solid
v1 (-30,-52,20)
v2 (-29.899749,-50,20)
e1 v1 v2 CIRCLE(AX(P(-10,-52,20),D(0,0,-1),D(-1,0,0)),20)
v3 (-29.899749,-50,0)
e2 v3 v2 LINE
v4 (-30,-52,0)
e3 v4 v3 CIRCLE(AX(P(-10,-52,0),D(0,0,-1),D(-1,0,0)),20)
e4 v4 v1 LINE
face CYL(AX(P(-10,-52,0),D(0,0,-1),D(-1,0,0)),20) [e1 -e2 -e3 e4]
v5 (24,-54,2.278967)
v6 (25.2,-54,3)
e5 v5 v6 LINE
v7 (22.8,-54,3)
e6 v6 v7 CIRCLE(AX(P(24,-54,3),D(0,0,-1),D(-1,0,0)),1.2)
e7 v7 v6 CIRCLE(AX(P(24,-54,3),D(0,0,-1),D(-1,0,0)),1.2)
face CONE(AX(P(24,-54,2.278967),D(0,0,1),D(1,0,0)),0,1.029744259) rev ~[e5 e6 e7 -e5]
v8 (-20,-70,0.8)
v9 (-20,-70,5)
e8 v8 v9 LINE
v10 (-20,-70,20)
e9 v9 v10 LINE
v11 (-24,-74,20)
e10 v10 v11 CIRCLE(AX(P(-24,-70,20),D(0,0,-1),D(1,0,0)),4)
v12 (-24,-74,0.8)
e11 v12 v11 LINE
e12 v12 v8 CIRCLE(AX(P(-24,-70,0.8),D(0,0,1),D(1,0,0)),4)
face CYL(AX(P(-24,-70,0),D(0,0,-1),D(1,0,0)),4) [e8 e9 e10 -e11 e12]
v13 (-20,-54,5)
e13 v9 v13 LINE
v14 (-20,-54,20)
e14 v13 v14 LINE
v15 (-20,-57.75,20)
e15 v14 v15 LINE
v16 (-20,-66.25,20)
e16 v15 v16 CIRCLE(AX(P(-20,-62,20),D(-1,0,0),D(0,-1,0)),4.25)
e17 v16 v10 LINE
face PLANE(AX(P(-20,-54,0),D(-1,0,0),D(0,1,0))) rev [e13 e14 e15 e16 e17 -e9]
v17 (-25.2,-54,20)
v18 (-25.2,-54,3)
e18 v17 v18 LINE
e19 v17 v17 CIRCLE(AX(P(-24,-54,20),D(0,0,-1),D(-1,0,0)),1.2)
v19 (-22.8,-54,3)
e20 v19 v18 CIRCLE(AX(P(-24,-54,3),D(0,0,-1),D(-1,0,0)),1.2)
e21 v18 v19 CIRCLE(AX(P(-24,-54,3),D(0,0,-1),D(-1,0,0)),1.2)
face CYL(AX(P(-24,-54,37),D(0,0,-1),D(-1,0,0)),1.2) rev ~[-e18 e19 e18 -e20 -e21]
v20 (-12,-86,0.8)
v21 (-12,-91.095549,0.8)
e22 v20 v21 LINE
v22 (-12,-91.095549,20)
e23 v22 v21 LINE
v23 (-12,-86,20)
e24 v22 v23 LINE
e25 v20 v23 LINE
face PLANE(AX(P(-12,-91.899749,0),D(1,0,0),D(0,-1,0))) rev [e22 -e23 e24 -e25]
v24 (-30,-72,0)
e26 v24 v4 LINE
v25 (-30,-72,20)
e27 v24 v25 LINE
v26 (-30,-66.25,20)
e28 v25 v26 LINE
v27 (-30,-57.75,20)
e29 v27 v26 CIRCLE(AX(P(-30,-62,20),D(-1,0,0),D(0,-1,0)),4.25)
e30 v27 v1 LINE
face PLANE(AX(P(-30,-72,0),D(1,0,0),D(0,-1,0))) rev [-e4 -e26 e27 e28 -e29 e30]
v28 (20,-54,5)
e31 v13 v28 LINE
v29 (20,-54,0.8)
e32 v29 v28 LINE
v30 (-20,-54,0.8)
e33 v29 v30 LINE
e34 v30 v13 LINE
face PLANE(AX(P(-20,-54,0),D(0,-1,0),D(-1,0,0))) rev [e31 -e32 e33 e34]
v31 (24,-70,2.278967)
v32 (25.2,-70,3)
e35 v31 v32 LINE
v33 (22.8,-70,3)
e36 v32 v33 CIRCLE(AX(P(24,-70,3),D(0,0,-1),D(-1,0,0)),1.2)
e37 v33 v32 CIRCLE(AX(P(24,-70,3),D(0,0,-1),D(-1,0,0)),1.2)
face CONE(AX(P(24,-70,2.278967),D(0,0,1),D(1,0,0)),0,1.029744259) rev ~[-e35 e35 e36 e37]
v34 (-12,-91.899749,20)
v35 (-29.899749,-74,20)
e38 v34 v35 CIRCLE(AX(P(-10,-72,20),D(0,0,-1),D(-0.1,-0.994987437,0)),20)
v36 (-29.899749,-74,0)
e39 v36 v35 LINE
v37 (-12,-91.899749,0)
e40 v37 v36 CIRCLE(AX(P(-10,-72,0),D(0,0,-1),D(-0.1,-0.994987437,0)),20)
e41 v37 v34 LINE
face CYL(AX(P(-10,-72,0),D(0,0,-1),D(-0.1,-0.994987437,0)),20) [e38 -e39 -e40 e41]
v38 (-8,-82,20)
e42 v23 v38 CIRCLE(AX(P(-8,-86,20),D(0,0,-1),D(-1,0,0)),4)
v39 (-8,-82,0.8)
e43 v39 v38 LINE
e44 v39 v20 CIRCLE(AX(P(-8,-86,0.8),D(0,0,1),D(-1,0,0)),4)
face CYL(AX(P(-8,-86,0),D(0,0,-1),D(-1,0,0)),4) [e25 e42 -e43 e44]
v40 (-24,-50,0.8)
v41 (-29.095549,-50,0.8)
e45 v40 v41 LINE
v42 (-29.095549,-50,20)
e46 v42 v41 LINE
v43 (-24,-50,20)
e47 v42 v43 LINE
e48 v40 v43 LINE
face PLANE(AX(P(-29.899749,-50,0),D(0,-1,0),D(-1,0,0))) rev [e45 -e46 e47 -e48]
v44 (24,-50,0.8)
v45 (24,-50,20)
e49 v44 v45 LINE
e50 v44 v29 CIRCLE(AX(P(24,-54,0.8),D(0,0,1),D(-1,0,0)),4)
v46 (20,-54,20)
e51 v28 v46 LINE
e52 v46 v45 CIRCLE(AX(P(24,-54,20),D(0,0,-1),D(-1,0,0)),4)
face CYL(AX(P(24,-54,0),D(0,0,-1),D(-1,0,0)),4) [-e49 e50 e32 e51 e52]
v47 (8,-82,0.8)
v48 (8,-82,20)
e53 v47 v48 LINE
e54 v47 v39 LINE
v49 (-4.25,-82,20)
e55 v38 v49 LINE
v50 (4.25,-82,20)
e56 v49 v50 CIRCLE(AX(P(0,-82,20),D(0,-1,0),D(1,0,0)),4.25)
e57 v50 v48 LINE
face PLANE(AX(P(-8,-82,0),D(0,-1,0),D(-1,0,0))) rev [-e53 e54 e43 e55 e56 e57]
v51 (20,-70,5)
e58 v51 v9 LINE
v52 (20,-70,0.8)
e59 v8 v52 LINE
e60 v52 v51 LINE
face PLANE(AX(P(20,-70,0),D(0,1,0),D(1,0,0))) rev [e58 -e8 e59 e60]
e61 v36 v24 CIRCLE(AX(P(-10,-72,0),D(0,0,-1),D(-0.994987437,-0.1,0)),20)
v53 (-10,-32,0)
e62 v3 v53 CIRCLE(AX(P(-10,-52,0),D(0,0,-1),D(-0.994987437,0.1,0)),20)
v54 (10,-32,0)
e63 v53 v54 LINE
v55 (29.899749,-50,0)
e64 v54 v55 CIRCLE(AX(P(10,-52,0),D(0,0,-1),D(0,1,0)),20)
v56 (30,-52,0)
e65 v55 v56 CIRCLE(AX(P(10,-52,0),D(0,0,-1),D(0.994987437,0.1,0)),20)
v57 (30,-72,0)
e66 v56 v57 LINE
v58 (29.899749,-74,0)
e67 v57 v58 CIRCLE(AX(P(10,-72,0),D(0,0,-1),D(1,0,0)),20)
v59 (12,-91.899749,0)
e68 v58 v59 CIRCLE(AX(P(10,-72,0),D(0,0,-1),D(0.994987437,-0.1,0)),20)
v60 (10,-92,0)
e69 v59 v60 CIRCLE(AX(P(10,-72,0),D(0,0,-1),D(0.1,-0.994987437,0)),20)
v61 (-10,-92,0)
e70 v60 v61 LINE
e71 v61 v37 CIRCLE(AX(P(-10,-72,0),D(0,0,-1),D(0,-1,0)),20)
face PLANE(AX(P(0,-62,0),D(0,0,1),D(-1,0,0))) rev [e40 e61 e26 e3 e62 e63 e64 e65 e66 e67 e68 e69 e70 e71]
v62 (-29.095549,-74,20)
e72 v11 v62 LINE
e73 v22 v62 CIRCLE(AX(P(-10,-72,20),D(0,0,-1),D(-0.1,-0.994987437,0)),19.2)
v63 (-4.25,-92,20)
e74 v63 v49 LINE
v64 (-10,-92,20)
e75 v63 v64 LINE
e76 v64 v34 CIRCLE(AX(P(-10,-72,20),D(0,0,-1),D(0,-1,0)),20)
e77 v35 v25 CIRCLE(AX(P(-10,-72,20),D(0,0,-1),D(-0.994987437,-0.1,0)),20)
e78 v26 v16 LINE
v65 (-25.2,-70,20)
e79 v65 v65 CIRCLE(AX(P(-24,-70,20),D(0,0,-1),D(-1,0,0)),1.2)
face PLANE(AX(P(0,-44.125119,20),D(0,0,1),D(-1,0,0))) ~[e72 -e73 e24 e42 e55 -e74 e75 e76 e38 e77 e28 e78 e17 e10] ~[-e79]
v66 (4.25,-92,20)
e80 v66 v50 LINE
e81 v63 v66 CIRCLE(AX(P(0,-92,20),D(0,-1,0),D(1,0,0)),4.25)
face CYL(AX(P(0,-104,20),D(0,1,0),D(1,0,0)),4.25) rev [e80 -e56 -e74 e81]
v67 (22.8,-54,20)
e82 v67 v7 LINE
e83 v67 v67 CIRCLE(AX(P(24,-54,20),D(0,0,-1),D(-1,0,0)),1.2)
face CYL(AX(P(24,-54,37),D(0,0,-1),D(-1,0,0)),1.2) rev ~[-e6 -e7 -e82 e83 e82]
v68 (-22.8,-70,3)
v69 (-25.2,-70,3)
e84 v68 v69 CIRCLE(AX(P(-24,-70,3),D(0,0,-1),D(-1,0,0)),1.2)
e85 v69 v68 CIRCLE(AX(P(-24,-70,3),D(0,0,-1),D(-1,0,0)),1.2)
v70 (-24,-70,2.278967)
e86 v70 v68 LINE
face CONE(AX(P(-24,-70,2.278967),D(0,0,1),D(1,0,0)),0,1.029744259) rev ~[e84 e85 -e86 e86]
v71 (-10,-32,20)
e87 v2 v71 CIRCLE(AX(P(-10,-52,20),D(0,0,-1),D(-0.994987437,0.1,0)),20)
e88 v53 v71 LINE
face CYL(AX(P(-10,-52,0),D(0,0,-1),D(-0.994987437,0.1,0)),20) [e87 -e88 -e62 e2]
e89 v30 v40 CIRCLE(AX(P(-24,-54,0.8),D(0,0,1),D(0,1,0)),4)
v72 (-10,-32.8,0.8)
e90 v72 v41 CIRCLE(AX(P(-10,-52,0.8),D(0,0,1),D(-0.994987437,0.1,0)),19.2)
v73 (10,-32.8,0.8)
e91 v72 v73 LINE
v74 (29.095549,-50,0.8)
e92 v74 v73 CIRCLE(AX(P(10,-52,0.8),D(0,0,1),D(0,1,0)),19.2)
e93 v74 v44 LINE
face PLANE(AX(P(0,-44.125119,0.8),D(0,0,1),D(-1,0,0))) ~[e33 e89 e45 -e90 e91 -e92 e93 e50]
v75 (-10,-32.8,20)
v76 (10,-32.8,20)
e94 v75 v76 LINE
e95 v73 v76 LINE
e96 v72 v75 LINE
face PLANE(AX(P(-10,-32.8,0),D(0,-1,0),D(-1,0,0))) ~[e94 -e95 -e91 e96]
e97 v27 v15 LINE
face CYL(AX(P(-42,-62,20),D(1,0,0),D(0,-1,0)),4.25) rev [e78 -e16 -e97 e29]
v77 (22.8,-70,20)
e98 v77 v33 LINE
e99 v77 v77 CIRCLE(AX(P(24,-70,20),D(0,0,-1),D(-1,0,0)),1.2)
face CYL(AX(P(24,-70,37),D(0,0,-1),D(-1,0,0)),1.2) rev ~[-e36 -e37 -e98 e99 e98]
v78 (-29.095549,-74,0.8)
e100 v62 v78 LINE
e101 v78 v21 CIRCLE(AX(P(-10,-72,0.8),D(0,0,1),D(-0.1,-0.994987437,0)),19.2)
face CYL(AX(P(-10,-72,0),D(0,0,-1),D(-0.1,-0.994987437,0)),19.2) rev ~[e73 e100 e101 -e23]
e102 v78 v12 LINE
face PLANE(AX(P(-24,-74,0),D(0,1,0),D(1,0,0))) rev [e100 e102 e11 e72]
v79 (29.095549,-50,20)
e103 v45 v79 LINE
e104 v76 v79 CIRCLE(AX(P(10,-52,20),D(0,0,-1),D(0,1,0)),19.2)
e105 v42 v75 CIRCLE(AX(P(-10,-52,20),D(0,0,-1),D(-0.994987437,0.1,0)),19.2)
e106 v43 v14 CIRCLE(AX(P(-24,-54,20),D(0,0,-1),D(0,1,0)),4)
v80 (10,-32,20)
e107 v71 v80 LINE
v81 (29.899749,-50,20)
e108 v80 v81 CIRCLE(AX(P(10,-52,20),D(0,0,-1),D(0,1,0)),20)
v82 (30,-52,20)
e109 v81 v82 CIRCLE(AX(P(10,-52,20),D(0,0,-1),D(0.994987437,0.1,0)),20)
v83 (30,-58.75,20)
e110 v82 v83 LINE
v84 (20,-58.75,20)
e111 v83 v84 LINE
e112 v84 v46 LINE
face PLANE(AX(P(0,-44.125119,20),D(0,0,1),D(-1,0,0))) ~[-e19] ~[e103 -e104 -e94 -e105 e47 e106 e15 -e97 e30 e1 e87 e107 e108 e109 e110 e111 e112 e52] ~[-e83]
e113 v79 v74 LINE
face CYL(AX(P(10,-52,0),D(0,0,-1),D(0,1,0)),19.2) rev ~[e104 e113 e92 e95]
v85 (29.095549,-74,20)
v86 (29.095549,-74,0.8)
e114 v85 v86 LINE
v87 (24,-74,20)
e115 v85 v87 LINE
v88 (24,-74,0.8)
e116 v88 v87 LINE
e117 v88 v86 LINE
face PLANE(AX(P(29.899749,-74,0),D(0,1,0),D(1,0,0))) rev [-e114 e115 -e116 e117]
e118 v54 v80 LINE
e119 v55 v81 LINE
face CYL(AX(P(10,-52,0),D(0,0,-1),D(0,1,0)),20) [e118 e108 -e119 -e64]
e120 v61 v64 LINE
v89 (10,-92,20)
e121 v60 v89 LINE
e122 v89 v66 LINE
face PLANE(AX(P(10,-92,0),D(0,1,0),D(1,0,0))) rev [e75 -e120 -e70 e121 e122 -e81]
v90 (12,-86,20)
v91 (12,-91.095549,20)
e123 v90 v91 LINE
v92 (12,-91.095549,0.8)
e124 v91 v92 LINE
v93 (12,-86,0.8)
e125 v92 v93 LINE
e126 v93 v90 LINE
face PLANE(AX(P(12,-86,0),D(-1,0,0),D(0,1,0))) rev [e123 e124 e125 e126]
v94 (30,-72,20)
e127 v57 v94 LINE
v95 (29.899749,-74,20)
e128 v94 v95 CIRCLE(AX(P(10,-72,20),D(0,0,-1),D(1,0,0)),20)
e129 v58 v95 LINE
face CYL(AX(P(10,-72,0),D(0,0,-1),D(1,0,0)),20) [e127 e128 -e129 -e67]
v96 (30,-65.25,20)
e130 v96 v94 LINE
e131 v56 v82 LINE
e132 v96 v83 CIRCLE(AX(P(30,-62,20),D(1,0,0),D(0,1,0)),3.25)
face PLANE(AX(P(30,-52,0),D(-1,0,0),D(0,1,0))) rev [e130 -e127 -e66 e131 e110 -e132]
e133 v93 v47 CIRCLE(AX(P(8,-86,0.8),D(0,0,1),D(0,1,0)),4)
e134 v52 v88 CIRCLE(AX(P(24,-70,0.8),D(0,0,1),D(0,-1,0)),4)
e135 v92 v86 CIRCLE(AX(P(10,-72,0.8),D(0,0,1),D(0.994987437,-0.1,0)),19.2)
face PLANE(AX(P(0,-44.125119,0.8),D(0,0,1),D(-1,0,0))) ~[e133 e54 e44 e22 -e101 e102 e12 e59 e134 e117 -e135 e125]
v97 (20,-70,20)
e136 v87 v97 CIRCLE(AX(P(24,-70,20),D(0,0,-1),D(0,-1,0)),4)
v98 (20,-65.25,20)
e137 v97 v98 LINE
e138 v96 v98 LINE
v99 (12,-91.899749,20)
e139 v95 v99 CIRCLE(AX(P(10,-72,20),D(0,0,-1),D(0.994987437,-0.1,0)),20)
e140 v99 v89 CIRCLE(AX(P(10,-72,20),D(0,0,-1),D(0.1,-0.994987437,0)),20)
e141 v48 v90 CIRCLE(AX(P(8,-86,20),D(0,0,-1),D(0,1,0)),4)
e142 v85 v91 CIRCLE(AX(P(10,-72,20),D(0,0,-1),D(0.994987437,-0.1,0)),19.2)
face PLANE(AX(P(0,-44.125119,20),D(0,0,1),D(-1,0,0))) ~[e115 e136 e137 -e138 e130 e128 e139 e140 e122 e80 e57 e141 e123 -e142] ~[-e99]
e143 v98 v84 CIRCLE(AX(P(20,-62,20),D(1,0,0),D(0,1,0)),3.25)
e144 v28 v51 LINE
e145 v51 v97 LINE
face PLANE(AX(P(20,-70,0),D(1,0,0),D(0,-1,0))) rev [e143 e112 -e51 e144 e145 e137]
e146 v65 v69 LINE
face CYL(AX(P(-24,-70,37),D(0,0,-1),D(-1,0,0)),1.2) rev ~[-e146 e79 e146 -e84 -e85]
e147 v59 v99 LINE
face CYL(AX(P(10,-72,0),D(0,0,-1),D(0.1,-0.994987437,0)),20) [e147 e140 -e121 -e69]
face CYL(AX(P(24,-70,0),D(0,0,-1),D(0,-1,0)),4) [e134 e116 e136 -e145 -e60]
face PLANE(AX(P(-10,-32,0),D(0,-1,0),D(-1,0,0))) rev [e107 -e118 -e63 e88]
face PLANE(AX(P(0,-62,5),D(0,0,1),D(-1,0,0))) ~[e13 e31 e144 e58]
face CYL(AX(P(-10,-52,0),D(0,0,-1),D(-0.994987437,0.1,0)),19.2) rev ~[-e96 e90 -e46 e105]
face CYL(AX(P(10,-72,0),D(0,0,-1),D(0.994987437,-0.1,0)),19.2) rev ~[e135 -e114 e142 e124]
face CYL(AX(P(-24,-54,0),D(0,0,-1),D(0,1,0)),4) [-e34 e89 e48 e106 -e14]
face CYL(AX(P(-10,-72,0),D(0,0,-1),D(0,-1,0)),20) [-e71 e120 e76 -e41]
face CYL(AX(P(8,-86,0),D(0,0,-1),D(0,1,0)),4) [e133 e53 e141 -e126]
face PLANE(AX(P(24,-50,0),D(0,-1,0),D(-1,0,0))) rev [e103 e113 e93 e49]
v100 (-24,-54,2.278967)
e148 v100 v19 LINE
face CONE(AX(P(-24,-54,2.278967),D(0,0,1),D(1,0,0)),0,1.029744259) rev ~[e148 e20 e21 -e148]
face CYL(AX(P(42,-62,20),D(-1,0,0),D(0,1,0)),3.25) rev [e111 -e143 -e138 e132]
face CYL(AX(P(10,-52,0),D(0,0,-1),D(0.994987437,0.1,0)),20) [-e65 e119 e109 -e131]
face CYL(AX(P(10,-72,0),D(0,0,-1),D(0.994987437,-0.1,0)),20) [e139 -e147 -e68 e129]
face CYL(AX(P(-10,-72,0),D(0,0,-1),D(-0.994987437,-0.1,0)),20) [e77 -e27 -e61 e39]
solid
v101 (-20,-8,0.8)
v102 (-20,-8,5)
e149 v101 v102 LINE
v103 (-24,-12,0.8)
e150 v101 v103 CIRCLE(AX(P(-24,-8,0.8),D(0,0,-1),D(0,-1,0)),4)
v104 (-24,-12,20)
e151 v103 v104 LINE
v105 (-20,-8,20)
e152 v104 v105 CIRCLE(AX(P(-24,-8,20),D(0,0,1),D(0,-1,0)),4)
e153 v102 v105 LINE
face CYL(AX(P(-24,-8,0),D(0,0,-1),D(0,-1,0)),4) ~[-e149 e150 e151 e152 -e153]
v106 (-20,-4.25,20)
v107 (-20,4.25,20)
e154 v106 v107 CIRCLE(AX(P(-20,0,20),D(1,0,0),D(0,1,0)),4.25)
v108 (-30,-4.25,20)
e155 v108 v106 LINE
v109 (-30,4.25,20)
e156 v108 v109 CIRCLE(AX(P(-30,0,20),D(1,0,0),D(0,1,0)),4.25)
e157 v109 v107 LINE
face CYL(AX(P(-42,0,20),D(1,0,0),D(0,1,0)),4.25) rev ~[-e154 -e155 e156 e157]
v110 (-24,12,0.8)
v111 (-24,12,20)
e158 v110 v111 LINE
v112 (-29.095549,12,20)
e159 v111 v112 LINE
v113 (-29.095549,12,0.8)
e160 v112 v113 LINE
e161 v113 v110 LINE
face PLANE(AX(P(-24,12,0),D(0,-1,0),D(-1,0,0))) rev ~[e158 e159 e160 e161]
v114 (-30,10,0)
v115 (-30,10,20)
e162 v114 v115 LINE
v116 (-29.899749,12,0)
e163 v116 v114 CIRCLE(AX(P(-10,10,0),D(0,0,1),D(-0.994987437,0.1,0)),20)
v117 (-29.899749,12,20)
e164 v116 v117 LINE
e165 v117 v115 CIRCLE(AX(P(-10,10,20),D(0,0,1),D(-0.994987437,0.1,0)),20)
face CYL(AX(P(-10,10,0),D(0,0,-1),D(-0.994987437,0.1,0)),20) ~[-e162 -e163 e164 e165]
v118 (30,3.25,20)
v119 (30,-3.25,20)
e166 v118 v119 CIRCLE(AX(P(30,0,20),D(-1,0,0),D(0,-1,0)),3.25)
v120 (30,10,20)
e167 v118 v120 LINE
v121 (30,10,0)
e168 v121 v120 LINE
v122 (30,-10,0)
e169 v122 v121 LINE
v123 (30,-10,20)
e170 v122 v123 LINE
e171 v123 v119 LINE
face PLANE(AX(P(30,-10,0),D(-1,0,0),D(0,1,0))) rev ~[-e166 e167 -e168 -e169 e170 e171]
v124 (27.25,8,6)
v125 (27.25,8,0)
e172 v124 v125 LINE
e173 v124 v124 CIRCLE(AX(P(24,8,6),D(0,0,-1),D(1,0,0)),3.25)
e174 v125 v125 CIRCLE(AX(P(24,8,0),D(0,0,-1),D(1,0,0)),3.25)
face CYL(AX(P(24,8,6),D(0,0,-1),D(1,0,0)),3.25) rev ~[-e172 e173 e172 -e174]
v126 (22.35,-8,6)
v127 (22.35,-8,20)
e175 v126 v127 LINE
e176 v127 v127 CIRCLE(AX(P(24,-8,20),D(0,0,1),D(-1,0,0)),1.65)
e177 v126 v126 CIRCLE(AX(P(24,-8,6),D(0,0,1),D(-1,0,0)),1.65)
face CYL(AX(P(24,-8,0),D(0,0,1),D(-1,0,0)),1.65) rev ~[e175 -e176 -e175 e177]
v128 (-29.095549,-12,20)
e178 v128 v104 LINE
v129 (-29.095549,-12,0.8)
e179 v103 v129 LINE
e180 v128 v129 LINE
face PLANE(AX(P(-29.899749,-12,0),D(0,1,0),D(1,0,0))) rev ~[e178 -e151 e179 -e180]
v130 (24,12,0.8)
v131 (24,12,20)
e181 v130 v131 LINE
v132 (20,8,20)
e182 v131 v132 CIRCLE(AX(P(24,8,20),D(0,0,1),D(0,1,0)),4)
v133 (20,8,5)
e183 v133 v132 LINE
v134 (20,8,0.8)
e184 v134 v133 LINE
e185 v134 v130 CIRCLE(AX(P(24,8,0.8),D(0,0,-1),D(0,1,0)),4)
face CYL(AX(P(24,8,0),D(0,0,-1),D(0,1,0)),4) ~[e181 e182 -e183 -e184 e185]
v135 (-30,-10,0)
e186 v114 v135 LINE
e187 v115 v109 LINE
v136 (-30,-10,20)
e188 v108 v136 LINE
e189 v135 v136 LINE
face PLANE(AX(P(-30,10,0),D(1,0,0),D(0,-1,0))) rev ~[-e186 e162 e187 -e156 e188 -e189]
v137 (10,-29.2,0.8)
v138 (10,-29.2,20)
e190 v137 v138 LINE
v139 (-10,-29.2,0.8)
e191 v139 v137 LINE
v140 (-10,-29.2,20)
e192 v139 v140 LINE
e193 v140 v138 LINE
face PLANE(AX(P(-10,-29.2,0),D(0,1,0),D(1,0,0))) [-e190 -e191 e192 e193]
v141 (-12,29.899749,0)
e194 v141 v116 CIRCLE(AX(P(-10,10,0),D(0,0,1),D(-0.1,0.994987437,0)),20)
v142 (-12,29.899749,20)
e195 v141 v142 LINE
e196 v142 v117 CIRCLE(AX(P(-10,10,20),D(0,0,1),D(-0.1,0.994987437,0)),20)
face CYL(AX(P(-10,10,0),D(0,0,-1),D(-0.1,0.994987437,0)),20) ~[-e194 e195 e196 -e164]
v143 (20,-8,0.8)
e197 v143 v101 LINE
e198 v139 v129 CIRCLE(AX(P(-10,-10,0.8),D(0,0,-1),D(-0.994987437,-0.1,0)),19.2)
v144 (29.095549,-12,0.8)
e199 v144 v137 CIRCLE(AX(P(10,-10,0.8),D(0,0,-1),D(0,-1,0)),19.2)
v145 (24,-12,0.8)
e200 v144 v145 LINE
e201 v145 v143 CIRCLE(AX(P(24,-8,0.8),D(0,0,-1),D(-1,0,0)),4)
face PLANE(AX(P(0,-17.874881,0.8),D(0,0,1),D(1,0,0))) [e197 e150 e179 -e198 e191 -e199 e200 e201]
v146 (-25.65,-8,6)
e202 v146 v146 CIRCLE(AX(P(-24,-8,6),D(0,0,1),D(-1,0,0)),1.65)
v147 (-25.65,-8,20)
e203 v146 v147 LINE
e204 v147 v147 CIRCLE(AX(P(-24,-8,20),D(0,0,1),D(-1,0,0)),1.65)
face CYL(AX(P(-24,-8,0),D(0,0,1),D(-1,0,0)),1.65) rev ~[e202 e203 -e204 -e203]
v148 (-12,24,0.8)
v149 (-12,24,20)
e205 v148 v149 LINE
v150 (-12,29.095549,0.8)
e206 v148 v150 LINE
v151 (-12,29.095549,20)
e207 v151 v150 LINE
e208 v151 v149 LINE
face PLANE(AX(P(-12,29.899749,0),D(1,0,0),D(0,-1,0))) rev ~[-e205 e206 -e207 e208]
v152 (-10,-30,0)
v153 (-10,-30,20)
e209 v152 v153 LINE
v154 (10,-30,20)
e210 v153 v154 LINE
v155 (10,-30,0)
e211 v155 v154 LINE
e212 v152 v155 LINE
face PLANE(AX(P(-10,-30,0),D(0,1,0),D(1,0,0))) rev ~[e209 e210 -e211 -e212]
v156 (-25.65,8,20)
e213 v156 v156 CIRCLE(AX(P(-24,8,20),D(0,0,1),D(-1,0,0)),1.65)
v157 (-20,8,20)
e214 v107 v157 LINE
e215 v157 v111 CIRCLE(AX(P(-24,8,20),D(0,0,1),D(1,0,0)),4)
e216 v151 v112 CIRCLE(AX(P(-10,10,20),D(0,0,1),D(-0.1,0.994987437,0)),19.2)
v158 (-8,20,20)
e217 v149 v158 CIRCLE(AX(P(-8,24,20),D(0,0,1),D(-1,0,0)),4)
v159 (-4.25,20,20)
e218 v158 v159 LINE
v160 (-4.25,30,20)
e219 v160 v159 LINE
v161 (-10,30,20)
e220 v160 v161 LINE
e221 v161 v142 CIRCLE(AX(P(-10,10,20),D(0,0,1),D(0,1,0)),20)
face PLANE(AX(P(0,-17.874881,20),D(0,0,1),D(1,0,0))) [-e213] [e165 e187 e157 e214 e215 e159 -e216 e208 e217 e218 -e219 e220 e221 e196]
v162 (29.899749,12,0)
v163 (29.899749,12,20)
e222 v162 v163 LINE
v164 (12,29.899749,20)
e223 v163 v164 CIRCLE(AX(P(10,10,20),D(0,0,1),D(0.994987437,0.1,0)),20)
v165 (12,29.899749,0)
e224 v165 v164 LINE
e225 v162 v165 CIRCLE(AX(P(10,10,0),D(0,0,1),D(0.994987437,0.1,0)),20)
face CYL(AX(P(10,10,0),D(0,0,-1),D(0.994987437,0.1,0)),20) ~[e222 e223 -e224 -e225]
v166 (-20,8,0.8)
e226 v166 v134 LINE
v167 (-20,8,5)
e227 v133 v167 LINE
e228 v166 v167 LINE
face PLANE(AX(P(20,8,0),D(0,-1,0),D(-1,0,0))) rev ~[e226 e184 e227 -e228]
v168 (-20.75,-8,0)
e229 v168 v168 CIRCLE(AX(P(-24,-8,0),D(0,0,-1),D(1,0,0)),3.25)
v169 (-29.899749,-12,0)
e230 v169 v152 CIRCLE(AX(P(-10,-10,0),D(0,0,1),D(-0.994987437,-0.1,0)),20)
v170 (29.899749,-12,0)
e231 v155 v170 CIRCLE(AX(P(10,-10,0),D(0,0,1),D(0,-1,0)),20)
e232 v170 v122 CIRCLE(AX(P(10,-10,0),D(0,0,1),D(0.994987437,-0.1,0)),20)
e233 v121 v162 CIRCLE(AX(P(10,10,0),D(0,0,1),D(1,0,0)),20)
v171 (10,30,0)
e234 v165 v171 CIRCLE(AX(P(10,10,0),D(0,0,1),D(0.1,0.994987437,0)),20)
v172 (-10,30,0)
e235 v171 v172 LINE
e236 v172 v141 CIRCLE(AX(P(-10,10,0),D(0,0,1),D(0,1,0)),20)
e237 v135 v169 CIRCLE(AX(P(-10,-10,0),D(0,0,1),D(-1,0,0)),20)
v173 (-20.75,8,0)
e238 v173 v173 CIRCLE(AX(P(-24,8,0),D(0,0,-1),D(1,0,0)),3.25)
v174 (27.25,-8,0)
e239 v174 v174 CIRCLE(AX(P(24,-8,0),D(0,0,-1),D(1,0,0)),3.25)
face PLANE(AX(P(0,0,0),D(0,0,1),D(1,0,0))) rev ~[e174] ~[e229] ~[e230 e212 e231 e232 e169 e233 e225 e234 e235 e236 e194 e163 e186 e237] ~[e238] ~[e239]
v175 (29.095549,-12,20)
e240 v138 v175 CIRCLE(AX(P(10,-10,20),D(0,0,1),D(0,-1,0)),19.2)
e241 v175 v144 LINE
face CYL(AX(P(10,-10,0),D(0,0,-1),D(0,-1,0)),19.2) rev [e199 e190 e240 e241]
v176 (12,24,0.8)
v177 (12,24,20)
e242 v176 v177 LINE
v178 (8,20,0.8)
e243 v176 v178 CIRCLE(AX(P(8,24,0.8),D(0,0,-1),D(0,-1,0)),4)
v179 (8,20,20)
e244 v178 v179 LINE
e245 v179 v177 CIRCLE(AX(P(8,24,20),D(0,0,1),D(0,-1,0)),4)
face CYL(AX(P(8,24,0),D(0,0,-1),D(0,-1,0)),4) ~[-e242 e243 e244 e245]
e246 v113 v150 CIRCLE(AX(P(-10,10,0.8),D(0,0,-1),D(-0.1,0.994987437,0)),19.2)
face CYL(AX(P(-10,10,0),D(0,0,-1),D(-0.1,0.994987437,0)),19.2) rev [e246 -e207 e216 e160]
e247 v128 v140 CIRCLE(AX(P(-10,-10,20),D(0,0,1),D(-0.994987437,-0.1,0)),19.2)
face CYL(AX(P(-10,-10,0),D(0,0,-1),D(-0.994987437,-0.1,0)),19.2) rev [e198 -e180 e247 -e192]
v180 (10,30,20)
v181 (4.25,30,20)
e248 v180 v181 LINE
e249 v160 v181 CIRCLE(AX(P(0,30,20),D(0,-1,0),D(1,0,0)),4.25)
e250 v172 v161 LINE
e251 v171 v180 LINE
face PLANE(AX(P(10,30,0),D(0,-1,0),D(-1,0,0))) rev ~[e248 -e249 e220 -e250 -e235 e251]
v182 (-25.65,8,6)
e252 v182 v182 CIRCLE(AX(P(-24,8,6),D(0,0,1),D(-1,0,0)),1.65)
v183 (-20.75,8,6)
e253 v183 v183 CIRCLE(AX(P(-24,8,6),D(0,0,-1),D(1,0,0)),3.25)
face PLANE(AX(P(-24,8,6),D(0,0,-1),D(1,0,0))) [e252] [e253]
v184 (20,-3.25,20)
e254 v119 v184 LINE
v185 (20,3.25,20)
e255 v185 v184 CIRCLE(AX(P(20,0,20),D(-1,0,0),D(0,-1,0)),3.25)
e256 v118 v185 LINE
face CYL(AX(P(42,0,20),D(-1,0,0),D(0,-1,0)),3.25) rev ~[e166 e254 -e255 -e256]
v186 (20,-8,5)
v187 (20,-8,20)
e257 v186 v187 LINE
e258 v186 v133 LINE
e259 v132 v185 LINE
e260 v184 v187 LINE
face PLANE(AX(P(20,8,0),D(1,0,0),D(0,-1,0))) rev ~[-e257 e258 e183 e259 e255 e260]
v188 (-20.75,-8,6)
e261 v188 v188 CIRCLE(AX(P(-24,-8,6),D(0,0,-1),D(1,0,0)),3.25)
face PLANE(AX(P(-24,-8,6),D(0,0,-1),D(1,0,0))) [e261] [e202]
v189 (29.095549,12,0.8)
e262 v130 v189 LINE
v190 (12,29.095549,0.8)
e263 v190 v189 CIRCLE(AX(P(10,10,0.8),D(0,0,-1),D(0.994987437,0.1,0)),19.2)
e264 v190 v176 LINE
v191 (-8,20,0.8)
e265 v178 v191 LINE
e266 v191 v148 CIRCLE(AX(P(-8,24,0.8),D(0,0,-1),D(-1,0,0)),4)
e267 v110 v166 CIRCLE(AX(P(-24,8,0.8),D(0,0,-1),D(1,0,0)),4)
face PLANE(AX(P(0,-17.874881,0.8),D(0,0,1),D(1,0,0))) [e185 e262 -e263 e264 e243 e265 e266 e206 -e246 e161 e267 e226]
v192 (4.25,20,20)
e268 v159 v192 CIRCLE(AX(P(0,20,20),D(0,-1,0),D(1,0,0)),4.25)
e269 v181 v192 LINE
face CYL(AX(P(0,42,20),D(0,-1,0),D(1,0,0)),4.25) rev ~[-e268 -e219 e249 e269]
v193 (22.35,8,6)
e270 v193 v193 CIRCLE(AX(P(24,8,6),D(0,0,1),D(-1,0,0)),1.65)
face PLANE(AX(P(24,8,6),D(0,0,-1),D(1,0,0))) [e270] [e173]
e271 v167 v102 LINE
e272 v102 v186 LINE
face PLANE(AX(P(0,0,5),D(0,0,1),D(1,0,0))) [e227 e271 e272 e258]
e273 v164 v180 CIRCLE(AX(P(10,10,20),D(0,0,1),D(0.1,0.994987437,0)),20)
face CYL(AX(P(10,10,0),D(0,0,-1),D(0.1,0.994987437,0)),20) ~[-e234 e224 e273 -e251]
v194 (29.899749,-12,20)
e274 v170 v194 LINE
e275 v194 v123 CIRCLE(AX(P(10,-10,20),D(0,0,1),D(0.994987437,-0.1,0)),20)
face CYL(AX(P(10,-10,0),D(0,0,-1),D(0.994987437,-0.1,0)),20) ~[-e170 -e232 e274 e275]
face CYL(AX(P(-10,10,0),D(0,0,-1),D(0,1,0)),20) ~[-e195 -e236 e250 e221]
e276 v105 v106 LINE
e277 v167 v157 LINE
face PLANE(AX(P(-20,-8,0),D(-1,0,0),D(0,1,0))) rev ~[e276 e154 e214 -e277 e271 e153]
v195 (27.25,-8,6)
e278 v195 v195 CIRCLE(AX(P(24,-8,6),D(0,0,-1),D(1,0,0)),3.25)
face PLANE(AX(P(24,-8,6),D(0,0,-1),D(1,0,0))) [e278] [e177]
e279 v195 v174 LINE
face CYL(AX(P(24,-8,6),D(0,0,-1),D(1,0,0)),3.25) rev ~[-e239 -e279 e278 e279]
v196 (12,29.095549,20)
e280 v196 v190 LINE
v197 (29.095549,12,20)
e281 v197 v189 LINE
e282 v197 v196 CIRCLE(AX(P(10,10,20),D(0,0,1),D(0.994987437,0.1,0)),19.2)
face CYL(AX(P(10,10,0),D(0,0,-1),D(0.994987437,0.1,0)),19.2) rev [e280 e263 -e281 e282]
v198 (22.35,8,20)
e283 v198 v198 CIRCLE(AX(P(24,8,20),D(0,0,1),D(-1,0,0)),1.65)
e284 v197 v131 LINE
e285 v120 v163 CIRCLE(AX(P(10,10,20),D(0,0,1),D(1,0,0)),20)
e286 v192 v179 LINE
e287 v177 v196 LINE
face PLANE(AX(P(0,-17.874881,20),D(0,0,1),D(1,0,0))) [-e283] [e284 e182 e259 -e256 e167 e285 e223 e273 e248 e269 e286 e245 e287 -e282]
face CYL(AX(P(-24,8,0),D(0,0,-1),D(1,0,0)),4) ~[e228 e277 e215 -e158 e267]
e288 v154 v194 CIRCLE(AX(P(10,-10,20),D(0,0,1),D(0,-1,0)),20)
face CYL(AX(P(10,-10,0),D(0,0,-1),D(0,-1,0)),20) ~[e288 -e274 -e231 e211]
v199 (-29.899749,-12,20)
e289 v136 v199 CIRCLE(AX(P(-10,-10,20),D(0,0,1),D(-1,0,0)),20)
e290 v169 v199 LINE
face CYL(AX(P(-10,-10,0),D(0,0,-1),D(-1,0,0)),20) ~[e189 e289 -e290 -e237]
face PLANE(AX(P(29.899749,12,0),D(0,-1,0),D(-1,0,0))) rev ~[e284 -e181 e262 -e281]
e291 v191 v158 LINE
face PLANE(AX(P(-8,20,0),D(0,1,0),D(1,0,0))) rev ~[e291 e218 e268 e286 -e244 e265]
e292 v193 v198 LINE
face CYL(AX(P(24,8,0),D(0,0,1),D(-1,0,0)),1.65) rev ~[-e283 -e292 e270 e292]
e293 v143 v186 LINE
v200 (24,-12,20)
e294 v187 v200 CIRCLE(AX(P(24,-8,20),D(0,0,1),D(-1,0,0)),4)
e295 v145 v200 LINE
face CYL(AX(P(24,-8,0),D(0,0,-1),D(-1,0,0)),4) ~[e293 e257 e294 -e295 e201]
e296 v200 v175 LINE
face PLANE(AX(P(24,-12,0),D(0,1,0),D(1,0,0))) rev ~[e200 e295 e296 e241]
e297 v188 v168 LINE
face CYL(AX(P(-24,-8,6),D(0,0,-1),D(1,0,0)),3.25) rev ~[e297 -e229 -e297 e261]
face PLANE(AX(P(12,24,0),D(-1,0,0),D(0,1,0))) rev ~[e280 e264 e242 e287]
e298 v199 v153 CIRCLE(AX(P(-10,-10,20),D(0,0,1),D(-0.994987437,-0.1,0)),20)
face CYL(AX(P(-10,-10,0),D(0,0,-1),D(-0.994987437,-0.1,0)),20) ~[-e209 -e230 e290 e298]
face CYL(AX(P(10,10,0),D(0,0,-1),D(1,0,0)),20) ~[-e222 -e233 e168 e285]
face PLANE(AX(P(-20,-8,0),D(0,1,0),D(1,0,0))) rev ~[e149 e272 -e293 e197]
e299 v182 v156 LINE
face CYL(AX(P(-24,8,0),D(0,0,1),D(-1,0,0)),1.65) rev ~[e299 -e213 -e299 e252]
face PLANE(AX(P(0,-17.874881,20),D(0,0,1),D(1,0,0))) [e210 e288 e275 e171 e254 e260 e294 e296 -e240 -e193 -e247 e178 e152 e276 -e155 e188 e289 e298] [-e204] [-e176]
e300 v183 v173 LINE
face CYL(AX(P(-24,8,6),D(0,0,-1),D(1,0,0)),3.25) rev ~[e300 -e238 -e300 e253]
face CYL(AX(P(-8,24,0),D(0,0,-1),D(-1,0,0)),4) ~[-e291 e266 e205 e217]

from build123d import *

# Parameters (mm, degrees)
F1_DEPTH        = 20
F2_T            = -0.8
F3_DEPTH        = 5
F4_DEPTH        = 20
F6_D            = 8.5
F6_DEPTH        = 12
F6_TIP          = 2.5536576309
F8_D            = 8.5
F8_DEPTH        = 12
F8_TIP          = 2.5536576309
F10_D           = 6.5
F10_DEPTH       = 12
F10_TIP         = 1.9527970118
F13_D           = 3.3
F13_CBORE_D     = 6.5
F13_CBORE_DEPTH = 6
F15_D           = 2.4
F15_DEPTH       = 17
F15_TIP         = 0.7210327428


# Not quite as in the source:
# - a feature names something its author has since deleted; it is built from what else it names


with BuildPart() as f1:
    # F0 (on Top) → F1 (new body)
    with BuildSketch(Plane.XY):
        with BuildLine():
            Line((-24, -12), (-29.8997487421, -12))
            ThreePointArc((-29.8997487421, -12), (-23.416407865, -24.8323969742), (-10, -30))
            Line((-10, -30), (0, -30))
            Line((0, -30), (10, -30))
            ThreePointArc((10, -30), (23.416407865, -24.8323969742), (29.8997487421, -12))
            Line((29.8997487421, -12), (24, -12))
            ThreePointArc((24, -12), (21.1715728753, -10.8284271247), (20, -8))
            Line((20, -8), (-20, -8))
            ThreePointArc((-20, -8), (-21.1715728753, -10.8284271247), (-24, -12))
        make_face()
        with BuildLine():
            Line((-24, 12), (-29.8997487421, 12))
            ThreePointArc((-29.8997487421, 12), (-29.9749214622, 11.0012555012), (-30, 10))
            Line((-30, 10), (-30, 0))
            Line((-30, 0), (-30, -10))
            ThreePointArc((-30, -10), (-29.9749214622, -11.0012555012), (-29.8997487421, -12))
            Line((-29.8997487421, -12), (-24, -12))
            ThreePointArc((-24, -12), (-21.1715728753, -10.8284271247), (-20, -8))
            Line((-20, -8), (-20, 0))
            Line((-20, 0), (-20, 8))
            ThreePointArc((-20, 8), (-21.1715728753, 10.8284271247), (-24, 12))
        make_face()
        with BuildLine():
            ThreePointArc((30, 10), (29.9749214622, 11.0012555012), (29.8997487421, 12))
            Line((29.8997487421, 12), (24, 12))
            ThreePointArc((24, 12), (21.1715728753, 10.8284271247), (20, 8))
            Line((20, 8), (20, 0))
            Line((20, 0), (20, -8))
            ThreePointArc((20, -8), (21.1715728753, -10.8284271247), (24, -12))
            Line((24, -12), (29.8997487421, -12))
            ThreePointArc((29.8997487421, -12), (29.9749214622, -11.0012555012), (30, -10))
            Line((30, -10), (30, 0))
            Line((30, 0), (30, 10))
        make_face()
        with BuildLine():
            Line((10, 30), (0, 30))
            Line((0, 30), (-10, 30))
            ThreePointArc((-10, 30), (-11.0012555012, 29.9749214622), (-12, 29.8997487421))
            Line((-12, 29.8997487421), (-12, 24))
            ThreePointArc((-12, 24), (-10.8284271247, 21.1715728753), (-8, 20))
            Line((-8, 20), (0, 20))
            Line((0, 20), (8, 20))
            ThreePointArc((8, 20), (10.8284271247, 21.1715728753), (12, 24))
            Line((12, 24), (12, 29.8997487421))
            ThreePointArc((12, 29.8997487421), (11.0012555012, 29.9749214622), (10, 30))
        make_face()
        with BuildLine():
            Line((-12, 24), (-12, 29.8997487421))
            ThreePointArc((-12, 29.8997487421), (-24.1421356237, 24.1421356237), (-29.8997487421, 12))
            Line((-29.8997487421, 12), (-24, 12))
            ThreePointArc((-24, 12), (-21.1715728753, 10.8284271247), (-20, 8))
            Line((-20, 8), (20, 8))
            ThreePointArc((20, 8), (21.1715728753, 10.8284271247), (24, 12))
            Line((24, 12), (29.8997487421, 12))
            ThreePointArc((29.8997487421, 12), (24.1421356237, 24.1421356237), (12, 29.8997487421))
            Line((12, 29.8997487421), (12, 24))
            ThreePointArc((12, 24), (10.8284271247, 21.1715728753), (8, 20))
            Line((8, 20), (0, 20))
            Line((0, 20), (-8, 20))
            ThreePointArc((-8, 20), (-10.8284271247, 21.1715728753), (-12, 24))
        make_face()
        Polygon((20, 8), (-20, 8), (-20, 0), (-20, -8), (20, -8), (20, 0), align=None)
    extrude(amount=F1_DEPTH)

    # F2
    f2_openings = [f1.faces().sort_by_distance(p)[0] for p in [
        (0, 0, 20),
    ]]
    offset(amount=F2_T, openings=f2_openings)

    # F0 (on Top) → F3 (join)
    with BuildSketch(Plane.XY):
        Polygon((20, 8), (-20, 8), (-20, 0), (-20, -8), (20, -8), (20, 0), align=None)
    extrude(amount=F3_DEPTH)

    # F0 (on Top) → F4 (join)
    with BuildSketch(Plane.XY):
        with BuildLine():
            ThreePointArc((30, 10), (29.9749214622, 11.0012555012), (29.8997487421, 12))
            Line((29.8997487421, 12), (24, 12))
            ThreePointArc((24, 12), (21.1715728753, 10.8284271247), (20, 8))
            Line((20, 8), (20, 0))
            Line((20, 0), (20, -8))
            ThreePointArc((20, -8), (21.1715728753, -10.8284271247), (24, -12))
            Line((24, -12), (29.8997487421, -12))
            ThreePointArc((29.8997487421, -12), (29.9749214622, -11.0012555012), (30, -10))
            Line((30, -10), (30, 0))
            Line((30, 0), (30, 10))
        make_face()
        with BuildLine():
            Line((10, 30), (0, 30))
            Line((0, 30), (-10, 30))
            ThreePointArc((-10, 30), (-11.0012555012, 29.9749214622), (-12, 29.8997487421))
            Line((-12, 29.8997487421), (-12, 24))
            ThreePointArc((-12, 24), (-10.8284271247, 21.1715728753), (-8, 20))
            Line((-8, 20), (0, 20))
            Line((0, 20), (8, 20))
            ThreePointArc((8, 20), (10.8284271247, 21.1715728753), (12, 24))
            Line((12, 24), (12, 29.8997487421))
            ThreePointArc((12, 29.8997487421), (11.0012555012, 29.9749214622), (10, 30))
        make_face()
        with BuildLine():
            Line((-24, 12), (-29.8997487421, 12))
            ThreePointArc((-29.8997487421, 12), (-29.9749214622, 11.0012555012), (-30, 10))
            Line((-30, 10), (-30, 0))
            Line((-30, 0), (-30, -10))
            ThreePointArc((-30, -10), (-29.9749214622, -11.0012555012), (-29.8997487421, -12))
            Line((-29.8997487421, -12), (-24, -12))
            ThreePointArc((-24, -12), (-21.1715728753, -10.8284271247), (-20, -8))
            Line((-20, -8), (-20, 0))
            Line((-20, 0), (-20, 8))
            ThreePointArc((-20, 8), (-21.1715728753, 10.8284271247), (-24, 12))
        make_face()
    extrude(amount=F4_DEPTH)

    # F6
    with Locations(Plane(origin=(-30, 0, 0), x_dir=(0, -1, 0), z_dir=(-1, 0, 0))):
        with Locations((0, 20)):
            Hole(F6_D / 2, depth=F6_DEPTH)
            with Locations((0, 0, -(F6_DEPTH + F6_TIP / 2))):  # 118° drill point
                Cone(0, F6_D / 2, F6_TIP, mode=Mode.SUBTRACT)

    # F8
    with Locations(Plane(origin=(0, 30, 0), x_dir=(-1, 0, 0), z_dir=(0, 1, 0))):
        with Locations((0, 20)):
            Hole(F8_D / 2, depth=F8_DEPTH)
            with Locations((0, 0, -(F8_DEPTH + F8_TIP / 2))):  # 118° drill point
                Cone(0, F8_D / 2, F8_TIP, mode=Mode.SUBTRACT)

    # F10
    with Locations(Plane.YZ.offset(30)):
        with Locations((0, 20)):
            Hole(F10_D / 2, depth=F10_DEPTH)
            with Locations((0, 0, -(F10_DEPTH + F10_TIP / 2))):  # 118° drill point
                Cone(0, F10_D / 2, F10_TIP, mode=Mode.SUBTRACT)


with BuildPart() as f12_1:
    # F12: instance of F1
    add(f1.part.mirror(Plane.XZ.offset(31)))

    # F15
    with Locations(Plane.XY.offset(20)):
        with Locations((-24, -54), (-24, -70), (24, -70), (24, -54)):
            Hole(F15_D / 2, depth=F15_DEPTH)
            with Locations((0, 0, -(F15_DEPTH + F15_TIP / 2))):  # 118° drill point
                Cone(0, F15_D / 2, F15_TIP, mode=Mode.SUBTRACT)


with BuildPart() as f1_1:
    add(f1.part)

    # F13 (through all)
    with Locations(Plane(origin=(0, 0, 0), x_dir=(1, 0, 0), z_dir=(0, 0, -1))):
        with Locations((-24, -8), (24, -8), (24, 8), (-24, 8)):
            CounterBoreHole(F13_D / 2, F13_CBORE_D / 2, F13_CBORE_DEPTH)


solid = Compound([f12_1.part, f1_1.part])
